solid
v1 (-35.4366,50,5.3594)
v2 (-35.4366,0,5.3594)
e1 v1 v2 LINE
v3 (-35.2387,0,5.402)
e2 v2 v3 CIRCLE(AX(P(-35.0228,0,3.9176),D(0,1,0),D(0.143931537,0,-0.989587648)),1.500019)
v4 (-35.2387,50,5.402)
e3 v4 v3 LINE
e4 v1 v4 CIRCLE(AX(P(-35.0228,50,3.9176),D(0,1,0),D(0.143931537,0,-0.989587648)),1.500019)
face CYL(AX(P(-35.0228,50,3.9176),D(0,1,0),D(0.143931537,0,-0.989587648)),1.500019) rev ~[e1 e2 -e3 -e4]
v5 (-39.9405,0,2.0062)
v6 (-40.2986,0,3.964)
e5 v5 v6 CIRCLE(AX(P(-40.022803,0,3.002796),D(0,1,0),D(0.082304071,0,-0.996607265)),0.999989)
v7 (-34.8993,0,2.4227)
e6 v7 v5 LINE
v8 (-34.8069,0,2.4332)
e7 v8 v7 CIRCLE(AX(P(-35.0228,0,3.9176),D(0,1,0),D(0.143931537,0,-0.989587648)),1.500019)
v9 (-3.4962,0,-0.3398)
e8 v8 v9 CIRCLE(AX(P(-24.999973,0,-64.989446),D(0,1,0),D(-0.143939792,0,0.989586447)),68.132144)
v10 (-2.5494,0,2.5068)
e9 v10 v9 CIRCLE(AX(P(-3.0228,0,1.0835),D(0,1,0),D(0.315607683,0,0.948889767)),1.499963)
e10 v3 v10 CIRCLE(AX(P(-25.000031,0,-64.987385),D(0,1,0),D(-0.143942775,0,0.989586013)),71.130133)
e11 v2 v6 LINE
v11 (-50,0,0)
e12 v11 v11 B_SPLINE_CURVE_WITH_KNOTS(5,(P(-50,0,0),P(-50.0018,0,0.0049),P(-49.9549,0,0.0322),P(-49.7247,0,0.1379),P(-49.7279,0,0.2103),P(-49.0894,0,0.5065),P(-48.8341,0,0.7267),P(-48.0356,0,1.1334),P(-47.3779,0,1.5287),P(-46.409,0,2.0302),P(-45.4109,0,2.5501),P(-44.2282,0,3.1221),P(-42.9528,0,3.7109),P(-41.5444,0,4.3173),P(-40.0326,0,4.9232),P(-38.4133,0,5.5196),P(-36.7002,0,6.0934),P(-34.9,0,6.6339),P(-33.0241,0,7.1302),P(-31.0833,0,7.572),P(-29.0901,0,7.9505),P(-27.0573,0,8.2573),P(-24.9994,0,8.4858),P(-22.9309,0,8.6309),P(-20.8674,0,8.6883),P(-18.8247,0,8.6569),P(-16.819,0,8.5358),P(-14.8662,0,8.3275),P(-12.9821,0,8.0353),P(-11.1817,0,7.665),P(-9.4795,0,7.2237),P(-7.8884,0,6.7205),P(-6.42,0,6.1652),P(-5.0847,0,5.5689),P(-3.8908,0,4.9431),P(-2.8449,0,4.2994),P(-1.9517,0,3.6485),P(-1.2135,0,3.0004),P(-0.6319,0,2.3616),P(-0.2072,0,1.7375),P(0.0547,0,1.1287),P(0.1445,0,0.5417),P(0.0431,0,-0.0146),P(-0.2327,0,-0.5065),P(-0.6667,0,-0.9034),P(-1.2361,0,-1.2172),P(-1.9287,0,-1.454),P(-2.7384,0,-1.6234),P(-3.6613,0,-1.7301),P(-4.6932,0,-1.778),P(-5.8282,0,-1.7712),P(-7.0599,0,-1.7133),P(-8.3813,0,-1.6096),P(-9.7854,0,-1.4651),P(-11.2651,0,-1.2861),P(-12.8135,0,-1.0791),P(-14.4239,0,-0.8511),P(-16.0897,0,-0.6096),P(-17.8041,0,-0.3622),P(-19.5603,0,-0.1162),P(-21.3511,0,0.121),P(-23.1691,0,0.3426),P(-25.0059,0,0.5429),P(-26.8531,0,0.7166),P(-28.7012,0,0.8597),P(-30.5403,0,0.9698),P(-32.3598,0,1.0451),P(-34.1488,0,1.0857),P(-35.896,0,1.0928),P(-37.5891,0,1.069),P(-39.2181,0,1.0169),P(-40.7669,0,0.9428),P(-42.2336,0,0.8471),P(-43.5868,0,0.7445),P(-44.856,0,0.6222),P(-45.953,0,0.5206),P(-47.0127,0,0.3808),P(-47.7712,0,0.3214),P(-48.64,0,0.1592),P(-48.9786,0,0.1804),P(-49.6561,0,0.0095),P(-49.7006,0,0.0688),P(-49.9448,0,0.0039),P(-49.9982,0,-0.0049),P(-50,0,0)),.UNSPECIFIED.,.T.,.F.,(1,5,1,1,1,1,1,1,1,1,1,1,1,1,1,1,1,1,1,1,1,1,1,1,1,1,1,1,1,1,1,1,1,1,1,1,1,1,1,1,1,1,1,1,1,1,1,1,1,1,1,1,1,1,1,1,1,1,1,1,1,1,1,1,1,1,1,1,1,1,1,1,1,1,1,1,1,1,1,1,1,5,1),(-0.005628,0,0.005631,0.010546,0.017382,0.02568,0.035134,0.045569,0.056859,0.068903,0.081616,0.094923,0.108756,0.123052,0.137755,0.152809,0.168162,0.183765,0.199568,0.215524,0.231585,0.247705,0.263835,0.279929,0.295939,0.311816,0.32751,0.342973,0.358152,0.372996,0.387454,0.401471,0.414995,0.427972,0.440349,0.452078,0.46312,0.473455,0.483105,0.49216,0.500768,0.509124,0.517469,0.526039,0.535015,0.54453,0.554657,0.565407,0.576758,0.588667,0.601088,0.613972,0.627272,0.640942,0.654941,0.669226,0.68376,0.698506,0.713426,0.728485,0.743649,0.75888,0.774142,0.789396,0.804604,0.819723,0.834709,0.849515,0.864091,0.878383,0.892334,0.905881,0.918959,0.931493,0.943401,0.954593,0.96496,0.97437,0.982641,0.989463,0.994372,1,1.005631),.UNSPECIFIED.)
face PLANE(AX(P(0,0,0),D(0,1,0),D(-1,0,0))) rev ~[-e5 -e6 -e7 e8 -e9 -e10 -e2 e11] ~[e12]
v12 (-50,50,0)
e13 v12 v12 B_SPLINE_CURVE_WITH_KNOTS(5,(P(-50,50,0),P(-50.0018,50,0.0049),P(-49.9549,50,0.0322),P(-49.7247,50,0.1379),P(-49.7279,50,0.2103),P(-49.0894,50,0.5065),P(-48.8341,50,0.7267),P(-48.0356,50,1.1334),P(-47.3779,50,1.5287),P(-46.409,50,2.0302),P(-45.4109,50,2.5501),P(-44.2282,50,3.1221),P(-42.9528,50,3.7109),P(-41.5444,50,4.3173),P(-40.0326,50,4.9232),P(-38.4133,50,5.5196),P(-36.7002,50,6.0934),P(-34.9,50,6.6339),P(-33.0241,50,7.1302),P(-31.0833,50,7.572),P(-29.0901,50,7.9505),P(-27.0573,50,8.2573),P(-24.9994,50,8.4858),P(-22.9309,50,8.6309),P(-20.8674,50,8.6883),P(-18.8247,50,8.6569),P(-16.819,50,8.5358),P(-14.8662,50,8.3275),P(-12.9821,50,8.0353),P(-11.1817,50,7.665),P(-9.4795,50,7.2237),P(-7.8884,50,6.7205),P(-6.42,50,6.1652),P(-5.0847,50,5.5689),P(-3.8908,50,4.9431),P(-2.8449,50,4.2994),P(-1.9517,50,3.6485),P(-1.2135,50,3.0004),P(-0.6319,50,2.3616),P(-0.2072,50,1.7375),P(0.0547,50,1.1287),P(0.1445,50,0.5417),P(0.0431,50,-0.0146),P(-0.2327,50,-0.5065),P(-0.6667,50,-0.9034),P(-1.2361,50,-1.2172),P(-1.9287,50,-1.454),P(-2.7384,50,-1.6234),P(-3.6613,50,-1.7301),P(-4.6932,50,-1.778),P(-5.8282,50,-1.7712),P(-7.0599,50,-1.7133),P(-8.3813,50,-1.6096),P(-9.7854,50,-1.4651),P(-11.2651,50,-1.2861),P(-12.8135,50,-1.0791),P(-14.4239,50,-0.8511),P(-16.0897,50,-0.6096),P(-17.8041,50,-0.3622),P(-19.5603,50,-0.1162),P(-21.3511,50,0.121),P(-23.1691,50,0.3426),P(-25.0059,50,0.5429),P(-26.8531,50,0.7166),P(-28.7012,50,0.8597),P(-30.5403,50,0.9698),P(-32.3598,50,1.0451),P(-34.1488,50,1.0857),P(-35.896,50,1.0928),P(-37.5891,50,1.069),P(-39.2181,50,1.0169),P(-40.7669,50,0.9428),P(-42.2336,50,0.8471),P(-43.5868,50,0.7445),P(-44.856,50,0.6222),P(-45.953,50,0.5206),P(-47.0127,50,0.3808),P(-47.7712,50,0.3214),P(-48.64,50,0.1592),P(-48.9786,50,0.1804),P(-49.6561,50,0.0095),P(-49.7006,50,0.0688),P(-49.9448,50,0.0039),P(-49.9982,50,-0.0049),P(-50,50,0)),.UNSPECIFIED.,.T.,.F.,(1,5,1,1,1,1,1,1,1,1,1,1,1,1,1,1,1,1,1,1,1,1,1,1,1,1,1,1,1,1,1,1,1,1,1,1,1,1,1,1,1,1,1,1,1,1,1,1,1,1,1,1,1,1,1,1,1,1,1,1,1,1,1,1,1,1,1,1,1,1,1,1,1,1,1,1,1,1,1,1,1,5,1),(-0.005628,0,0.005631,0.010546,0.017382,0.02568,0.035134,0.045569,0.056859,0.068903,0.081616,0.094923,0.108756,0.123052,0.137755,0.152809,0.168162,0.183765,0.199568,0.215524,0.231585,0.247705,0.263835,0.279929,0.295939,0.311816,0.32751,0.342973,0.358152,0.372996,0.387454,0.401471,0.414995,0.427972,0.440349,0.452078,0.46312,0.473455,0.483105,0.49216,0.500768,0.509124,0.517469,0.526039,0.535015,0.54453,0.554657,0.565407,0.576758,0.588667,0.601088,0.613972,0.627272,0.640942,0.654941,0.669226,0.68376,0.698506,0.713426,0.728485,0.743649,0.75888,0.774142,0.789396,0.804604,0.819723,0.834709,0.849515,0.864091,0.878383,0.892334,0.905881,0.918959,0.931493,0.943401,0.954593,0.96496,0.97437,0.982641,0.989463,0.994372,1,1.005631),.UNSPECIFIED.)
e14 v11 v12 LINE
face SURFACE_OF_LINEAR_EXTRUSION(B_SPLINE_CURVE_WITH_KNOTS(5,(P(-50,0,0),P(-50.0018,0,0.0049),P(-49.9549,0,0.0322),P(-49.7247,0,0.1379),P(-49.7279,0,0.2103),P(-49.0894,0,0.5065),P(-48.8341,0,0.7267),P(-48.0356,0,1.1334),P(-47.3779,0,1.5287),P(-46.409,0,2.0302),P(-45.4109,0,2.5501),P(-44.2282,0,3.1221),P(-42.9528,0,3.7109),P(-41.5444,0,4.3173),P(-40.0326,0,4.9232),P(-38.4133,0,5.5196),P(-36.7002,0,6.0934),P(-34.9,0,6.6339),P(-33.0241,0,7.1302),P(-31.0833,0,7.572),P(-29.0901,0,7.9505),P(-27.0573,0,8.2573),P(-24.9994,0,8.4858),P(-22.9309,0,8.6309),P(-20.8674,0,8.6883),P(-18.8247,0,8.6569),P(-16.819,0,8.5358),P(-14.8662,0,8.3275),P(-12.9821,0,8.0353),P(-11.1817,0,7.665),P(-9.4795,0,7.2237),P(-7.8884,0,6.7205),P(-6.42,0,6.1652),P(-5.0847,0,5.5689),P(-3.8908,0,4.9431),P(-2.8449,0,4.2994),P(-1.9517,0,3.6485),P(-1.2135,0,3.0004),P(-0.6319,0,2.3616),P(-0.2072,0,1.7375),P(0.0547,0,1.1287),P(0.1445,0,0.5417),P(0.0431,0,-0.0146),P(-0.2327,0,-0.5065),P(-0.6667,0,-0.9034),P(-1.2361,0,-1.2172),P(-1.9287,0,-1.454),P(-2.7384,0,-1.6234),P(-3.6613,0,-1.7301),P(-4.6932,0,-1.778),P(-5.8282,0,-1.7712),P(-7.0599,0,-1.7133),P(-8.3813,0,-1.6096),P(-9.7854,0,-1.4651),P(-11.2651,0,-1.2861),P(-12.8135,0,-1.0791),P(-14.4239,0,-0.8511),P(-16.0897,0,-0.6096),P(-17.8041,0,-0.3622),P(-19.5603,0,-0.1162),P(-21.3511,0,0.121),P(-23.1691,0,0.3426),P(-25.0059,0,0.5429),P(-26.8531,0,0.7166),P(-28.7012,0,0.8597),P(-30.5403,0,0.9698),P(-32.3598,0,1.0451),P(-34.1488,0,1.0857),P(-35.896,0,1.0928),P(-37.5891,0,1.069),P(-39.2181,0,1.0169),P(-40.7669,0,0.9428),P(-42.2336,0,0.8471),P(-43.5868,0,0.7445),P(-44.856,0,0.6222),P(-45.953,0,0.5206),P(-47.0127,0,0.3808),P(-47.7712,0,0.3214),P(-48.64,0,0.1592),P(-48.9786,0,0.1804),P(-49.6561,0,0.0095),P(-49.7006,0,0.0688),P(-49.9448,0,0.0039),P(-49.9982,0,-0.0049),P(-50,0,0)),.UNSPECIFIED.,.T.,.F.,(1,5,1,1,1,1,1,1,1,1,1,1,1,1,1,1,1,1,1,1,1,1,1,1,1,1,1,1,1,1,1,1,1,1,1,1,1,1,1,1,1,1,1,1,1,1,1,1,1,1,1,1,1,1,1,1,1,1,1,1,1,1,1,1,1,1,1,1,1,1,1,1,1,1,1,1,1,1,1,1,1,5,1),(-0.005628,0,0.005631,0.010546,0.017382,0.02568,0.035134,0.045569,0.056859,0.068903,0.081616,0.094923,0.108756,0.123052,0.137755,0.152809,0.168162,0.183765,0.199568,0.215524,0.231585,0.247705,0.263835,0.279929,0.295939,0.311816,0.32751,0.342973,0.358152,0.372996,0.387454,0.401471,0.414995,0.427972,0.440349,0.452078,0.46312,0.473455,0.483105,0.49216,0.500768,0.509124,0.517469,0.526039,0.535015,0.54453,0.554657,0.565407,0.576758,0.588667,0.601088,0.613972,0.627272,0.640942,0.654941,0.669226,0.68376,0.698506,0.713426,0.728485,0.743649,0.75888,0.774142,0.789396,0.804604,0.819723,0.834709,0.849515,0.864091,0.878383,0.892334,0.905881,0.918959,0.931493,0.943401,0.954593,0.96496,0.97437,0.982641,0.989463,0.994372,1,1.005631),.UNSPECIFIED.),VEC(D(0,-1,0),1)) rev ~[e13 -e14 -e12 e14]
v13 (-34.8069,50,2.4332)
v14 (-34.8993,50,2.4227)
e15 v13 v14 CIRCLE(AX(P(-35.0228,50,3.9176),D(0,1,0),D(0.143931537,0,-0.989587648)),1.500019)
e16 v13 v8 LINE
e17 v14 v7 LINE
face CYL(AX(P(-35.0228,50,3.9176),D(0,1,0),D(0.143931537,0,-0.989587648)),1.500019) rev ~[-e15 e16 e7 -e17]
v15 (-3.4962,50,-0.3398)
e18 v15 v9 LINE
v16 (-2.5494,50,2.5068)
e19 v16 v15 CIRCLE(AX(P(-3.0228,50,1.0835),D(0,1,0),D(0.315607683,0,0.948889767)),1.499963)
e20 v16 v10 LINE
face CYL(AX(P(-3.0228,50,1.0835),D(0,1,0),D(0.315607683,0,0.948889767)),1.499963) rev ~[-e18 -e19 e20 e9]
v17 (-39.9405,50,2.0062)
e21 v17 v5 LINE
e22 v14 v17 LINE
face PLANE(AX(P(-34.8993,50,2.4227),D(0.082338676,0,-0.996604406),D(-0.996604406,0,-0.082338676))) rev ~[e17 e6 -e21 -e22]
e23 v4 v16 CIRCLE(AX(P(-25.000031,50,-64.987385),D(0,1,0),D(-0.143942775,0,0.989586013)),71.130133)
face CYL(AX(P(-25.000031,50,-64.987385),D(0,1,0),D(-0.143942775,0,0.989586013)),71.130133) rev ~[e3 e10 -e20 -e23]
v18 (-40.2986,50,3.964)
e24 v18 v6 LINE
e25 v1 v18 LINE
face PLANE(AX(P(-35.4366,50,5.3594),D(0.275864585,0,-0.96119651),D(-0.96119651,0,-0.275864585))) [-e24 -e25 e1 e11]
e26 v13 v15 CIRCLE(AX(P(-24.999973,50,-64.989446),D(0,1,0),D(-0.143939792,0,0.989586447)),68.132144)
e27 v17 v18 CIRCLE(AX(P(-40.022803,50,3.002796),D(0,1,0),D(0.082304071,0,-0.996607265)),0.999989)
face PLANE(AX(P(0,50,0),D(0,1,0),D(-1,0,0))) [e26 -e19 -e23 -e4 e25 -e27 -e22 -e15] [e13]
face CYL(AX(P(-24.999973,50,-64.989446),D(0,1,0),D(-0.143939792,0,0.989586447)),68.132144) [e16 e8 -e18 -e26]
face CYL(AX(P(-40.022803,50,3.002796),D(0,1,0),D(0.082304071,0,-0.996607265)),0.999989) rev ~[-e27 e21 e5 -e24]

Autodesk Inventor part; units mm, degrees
ref_plane "YZ Plane" through (0, 0, 0) normal (1, 0, 0) x (0, 1, 0)
ref_plane "XZ Plane" through (0, 0, 0) normal (0, 1, 0) x (-1, 0, 0)
ref_plane "XY Plane" through (0, 0, 0) normal (0, 0, 1) x (1, 0, 0)
sketch "草圖1" plane through (0, 0, 0) normal (0, 1, 0) x (-1, 0, 0)
  spline S0 degree 5 poles (50, 0) (50.0018, 0.0049) (49.9549, 0.0322) (49.7247, 0.1379) (49.7279, 0.2103) (49.0894, 0.5065) (48.8341, 0.7267) (48.0356, 1.1334) (47.3779, 1.5287) (46.409, 2.0302) (45.4109, 2.5501) (44.2282, 3.1221) (42.9528, 3.7109) (41.5444, 4.3173) (40.0326, 4.9232) (38.4133, 5.5196) (36.7002, 6.0934) (34.9, 6.6339) (33.0241, 7.1302) (31.0833, 7.572) (29.0901, 7.9505) (27.0573, 8.2573) (24.9994, 8.4858) (22.9309, 8.6309) (20.8674, 8.6883) (18.8247, 8.6569) (16.819, 8.5358) (14.8662, 8.3275) (12.9821, 8.0353) (11.1817, 7.665) (9.4795, 7.2237) (7.8884, 6.7205) (6.42, 6.1652) (5.0847, 5.5689) (3.8908, 4.9431) (2.8449, 4.2994) (1.9517, 3.6485) (1.2135, 3.0004) (0.6319, 2.3616) (0.2072, 1.7375) (-0.0547, 1.1287) (-0.1445, 0.5417) (-0.0431, -0.0146) (0.2327, -0.5065) (0.6667, -0.9034) (1.2361, -1.2172) (1.9287, -1.454) (2.7384, -1.6234) (3.6613, -1.7301) (4.6932, -1.778) (5.8282, -1.7712) (7.0599, -1.7133) (8.3813, -1.6096) (9.7854, -1.4651) (11.2651, -1.2861) (12.8135, -1.0791) (14.4239, -0.8511) (16.0897, -0.6096) (17.8041, -0.3622) (19.5603, -0.1162) (21.3511, 0.121) (23.1691, 0.3426) (25.0059, 0.5429) (26.8531, 0.7166) (28.7012, 0.8597) (30.5403, 0.9698) (32.3598, 1.0451) (34.1488, 1.0857) (35.896, 1.0928) (37.5891, 1.069) (39.2181, 1.0169) (40.7669, 0.9428) (42.2336, 0.8471) (43.5868, 0.7445) (44.856, 0.6222) (45.953, 0.5206) (47.0127, 0.3808) (47.7712, 0.3214) (48.64, 0.1592) (48.9786, 0.1804) (49.6561, 0.0095) (49.7006, 0.0688) (49.9448, 0.0039) (49.9982, -0.0049) (50, 0) knots 0 0 0 0 0 0 0.005631 0.010546 0.017382 0.02568 0.035134 0.045569 0.056859 0.068903 0.081616 0.094923 0.108756 0.123052 0.137755 0.152809 0.168162 0.183765 0.199568 0.215524 0.231585 0.247705 0.263835 0.279929 0.295939 0.311816 0.32751 0.342973 0.358152 0.372996 0.387454 0.401471 0.414995 0.427972 0.440349 0.452078 0.46312 0.473455 0.483105 0.49216 0.500768 0.509124 0.517469 0.526039 0.535015 0.54453 0.554657 0.565407 0.576758 0.588667 0.601088 0.613972 0.627272 0.640942 0.654941 0.669226 0.68376 0.698506 0.713426 0.728485 0.743649 0.75888 0.774142 0.789396 0.804604 0.819723 0.834709 0.849515 0.864091 0.878383 0.892334 0.905881 0.918959 0.931493 0.943401 0.954593 0.96496 0.97437 0.982641 0.989463 0.994372 1 1 1 1 1 1
  point P0 (0, 0)
  point P1 (49.7146, 0.1731)
  point P2 (49.3586, 0.3861)
  point P3 (48.8615, 0.6782)
  point P4 (48.2248, 1.0432)
  point P5 (47.4504, 1.4739)
  point P6 (46.541, 1.9614)
  point P7 (45.4995, 2.496)
  point P8 (44.3301, 3.0669)
  point P9 (43.0373, 3.6629)
  point P10 (41.6267, 4.2721)
  point P11 (40.1046, 4.8827)
  point P12 (38.4784, 5.4828)
  point P13 (36.7563, 6.0603)
  point P14 (34.9477, 6.604)
  point P15 (33.0628, 7.103)
  point P16 (31.1129, 7.5473)
  point P17 (29.1101, 7.9275)
  point P18 (27.0678, 8.2355)
  point P19 (25, 8.4646)
  point P20 (22.9217, 8.6095)
  point P21 (20.8483, 8.6662)
  point P22 (18.7959, 8.633)
  point P23 (16.7807, 8.5097)
  point P24 (14.8189, 8.298)
  point P25 (12.9263, 8.0018)
  point P26 (11.1183, 7.6267)
  point P27 (9.4093, 7.1799)
  point P28 (7.8126, 6.6704)
  point P29 (6.3402, 6.1082)
  point P30 (5.0027, 5.5044)
  point P31 (3.8089, 4.8706)
  point P32 (2.7662, 4.2188)
  point P33 (1.8803, 3.5604)
  point P34 (1.1555, 2.9064)
  point P35 (0.5946, 2.267)
  point P36 (0.1988, 1.6507)
  point P37 (-0.0315, 1.0644)
  point P38 (-0.0972, 0.5131)
  point P39 (0, 0)
  point P40 (0.2513, -0.4578)
  point P41 (0.6471, -0.8441)
  point P42 (1.1827, -1.1602)
  point P43 (1.8527, -1.4076)
  point P44 (2.6505, -1.5884)
  point P45 (3.5694, -1.7054)
  point P46 (4.6018, -1.7617)
  point P47 (5.7403, -1.7612)
  point P48 (6.9771, -1.7083)
  point P49 (8.3044, -1.6082)
  point P50 (9.715, -1.4664)
  point P51 (11.2014, -1.2893)
  point P52 (12.7568, -1.0837)
  point P53 (14.3742, -0.8568)
  point P54 (16.0469, -0.616)
  point P55 (17.7685, -0.3691)
  point P56 (19.5318, -0.1235)
  point P57 (21.33, 0.1136)
  point P58 (23.1554, 0.3352)
  point P59 (25, 0.5354)
  point P60 (26.8552, 0.7091)
  point P61 (28.7116, 0.8523)
  point P62 (30.5594, 0.9623)
  point P63 (32.388, 1.0375)
  point P64 (34.1865, 1.0779)
  point P65 (35.9432, 1.0848)
  point P66 (37.6465, 1.0602)
  point P67 (39.2846, 1.0078)
  point P68 (40.8457, 0.9319)
  point P69 (42.318, 0.8371)
  point P70 (43.6902, 0.7292)
  point P71 (44.9513, 0.6135)
  point P72 (46.0911, 0.4956)
  point P73 (47.0999, 0.3811)
  point P74 (47.9692, 0.2748)
  point P75 (48.6913, 0.1812)
  point P76 (49.26, 0.1043)
  point P77 (49.6698, 0.0472)
  point P78 (49.9173, 0.0119)
extrude "擠出1" add sketch "草圖1" along normal blind 50
sketch "草圖2" plane through (0, 50, 0) normal (0, 1, 0) x (1, 0, 0)
  arc A0 (-50, 0) -> (0, 0) centre (-25, 64.9885) ccw construction
  arc A1 (-35.0228, -3.9176) -> (-3.0228, -1.0835) centre (-25, 64.9885) ccw construction
  arc A2 (-35.2387, -5.402) -> (-2.5494, -2.5068) centre (-25, 64.9885) ccw
  arc A3 (-34.8069, -2.4332) -> (-3.4962, 0.3398) centre (-25, 64.9885) ccw
  arc A4 (-34.8069, -2.4332) -> (-35.2387, -5.402) centre (-35.0228, -3.9176) ccw
  arc A5 (-2.5494, -2.5068) -> (-3.4962, 0.3398) centre (-3.0228, -1.0835) ccw
  arc A6 (-39.9405, -2.0062) -> (-40.2986, -3.964) centre (-40.0228, -3.0028) ccw
  line L0 (-34.8993, -2.4227) -> (-39.9405, -2.0062)
  line L1 (-35.4366, -5.3594) -> (-40.2986, -3.964)
  dimension "d2" = 1.5
  dimension "d3" = 71.1312
  dimension "d4" = 32
  dimension "d5" = 3.2111
  dimension "d6" = 2
  dimension "d7" = 5
extrude "擠出2" cut sketch "草圖2" against normal through all
properties part number "9518"
